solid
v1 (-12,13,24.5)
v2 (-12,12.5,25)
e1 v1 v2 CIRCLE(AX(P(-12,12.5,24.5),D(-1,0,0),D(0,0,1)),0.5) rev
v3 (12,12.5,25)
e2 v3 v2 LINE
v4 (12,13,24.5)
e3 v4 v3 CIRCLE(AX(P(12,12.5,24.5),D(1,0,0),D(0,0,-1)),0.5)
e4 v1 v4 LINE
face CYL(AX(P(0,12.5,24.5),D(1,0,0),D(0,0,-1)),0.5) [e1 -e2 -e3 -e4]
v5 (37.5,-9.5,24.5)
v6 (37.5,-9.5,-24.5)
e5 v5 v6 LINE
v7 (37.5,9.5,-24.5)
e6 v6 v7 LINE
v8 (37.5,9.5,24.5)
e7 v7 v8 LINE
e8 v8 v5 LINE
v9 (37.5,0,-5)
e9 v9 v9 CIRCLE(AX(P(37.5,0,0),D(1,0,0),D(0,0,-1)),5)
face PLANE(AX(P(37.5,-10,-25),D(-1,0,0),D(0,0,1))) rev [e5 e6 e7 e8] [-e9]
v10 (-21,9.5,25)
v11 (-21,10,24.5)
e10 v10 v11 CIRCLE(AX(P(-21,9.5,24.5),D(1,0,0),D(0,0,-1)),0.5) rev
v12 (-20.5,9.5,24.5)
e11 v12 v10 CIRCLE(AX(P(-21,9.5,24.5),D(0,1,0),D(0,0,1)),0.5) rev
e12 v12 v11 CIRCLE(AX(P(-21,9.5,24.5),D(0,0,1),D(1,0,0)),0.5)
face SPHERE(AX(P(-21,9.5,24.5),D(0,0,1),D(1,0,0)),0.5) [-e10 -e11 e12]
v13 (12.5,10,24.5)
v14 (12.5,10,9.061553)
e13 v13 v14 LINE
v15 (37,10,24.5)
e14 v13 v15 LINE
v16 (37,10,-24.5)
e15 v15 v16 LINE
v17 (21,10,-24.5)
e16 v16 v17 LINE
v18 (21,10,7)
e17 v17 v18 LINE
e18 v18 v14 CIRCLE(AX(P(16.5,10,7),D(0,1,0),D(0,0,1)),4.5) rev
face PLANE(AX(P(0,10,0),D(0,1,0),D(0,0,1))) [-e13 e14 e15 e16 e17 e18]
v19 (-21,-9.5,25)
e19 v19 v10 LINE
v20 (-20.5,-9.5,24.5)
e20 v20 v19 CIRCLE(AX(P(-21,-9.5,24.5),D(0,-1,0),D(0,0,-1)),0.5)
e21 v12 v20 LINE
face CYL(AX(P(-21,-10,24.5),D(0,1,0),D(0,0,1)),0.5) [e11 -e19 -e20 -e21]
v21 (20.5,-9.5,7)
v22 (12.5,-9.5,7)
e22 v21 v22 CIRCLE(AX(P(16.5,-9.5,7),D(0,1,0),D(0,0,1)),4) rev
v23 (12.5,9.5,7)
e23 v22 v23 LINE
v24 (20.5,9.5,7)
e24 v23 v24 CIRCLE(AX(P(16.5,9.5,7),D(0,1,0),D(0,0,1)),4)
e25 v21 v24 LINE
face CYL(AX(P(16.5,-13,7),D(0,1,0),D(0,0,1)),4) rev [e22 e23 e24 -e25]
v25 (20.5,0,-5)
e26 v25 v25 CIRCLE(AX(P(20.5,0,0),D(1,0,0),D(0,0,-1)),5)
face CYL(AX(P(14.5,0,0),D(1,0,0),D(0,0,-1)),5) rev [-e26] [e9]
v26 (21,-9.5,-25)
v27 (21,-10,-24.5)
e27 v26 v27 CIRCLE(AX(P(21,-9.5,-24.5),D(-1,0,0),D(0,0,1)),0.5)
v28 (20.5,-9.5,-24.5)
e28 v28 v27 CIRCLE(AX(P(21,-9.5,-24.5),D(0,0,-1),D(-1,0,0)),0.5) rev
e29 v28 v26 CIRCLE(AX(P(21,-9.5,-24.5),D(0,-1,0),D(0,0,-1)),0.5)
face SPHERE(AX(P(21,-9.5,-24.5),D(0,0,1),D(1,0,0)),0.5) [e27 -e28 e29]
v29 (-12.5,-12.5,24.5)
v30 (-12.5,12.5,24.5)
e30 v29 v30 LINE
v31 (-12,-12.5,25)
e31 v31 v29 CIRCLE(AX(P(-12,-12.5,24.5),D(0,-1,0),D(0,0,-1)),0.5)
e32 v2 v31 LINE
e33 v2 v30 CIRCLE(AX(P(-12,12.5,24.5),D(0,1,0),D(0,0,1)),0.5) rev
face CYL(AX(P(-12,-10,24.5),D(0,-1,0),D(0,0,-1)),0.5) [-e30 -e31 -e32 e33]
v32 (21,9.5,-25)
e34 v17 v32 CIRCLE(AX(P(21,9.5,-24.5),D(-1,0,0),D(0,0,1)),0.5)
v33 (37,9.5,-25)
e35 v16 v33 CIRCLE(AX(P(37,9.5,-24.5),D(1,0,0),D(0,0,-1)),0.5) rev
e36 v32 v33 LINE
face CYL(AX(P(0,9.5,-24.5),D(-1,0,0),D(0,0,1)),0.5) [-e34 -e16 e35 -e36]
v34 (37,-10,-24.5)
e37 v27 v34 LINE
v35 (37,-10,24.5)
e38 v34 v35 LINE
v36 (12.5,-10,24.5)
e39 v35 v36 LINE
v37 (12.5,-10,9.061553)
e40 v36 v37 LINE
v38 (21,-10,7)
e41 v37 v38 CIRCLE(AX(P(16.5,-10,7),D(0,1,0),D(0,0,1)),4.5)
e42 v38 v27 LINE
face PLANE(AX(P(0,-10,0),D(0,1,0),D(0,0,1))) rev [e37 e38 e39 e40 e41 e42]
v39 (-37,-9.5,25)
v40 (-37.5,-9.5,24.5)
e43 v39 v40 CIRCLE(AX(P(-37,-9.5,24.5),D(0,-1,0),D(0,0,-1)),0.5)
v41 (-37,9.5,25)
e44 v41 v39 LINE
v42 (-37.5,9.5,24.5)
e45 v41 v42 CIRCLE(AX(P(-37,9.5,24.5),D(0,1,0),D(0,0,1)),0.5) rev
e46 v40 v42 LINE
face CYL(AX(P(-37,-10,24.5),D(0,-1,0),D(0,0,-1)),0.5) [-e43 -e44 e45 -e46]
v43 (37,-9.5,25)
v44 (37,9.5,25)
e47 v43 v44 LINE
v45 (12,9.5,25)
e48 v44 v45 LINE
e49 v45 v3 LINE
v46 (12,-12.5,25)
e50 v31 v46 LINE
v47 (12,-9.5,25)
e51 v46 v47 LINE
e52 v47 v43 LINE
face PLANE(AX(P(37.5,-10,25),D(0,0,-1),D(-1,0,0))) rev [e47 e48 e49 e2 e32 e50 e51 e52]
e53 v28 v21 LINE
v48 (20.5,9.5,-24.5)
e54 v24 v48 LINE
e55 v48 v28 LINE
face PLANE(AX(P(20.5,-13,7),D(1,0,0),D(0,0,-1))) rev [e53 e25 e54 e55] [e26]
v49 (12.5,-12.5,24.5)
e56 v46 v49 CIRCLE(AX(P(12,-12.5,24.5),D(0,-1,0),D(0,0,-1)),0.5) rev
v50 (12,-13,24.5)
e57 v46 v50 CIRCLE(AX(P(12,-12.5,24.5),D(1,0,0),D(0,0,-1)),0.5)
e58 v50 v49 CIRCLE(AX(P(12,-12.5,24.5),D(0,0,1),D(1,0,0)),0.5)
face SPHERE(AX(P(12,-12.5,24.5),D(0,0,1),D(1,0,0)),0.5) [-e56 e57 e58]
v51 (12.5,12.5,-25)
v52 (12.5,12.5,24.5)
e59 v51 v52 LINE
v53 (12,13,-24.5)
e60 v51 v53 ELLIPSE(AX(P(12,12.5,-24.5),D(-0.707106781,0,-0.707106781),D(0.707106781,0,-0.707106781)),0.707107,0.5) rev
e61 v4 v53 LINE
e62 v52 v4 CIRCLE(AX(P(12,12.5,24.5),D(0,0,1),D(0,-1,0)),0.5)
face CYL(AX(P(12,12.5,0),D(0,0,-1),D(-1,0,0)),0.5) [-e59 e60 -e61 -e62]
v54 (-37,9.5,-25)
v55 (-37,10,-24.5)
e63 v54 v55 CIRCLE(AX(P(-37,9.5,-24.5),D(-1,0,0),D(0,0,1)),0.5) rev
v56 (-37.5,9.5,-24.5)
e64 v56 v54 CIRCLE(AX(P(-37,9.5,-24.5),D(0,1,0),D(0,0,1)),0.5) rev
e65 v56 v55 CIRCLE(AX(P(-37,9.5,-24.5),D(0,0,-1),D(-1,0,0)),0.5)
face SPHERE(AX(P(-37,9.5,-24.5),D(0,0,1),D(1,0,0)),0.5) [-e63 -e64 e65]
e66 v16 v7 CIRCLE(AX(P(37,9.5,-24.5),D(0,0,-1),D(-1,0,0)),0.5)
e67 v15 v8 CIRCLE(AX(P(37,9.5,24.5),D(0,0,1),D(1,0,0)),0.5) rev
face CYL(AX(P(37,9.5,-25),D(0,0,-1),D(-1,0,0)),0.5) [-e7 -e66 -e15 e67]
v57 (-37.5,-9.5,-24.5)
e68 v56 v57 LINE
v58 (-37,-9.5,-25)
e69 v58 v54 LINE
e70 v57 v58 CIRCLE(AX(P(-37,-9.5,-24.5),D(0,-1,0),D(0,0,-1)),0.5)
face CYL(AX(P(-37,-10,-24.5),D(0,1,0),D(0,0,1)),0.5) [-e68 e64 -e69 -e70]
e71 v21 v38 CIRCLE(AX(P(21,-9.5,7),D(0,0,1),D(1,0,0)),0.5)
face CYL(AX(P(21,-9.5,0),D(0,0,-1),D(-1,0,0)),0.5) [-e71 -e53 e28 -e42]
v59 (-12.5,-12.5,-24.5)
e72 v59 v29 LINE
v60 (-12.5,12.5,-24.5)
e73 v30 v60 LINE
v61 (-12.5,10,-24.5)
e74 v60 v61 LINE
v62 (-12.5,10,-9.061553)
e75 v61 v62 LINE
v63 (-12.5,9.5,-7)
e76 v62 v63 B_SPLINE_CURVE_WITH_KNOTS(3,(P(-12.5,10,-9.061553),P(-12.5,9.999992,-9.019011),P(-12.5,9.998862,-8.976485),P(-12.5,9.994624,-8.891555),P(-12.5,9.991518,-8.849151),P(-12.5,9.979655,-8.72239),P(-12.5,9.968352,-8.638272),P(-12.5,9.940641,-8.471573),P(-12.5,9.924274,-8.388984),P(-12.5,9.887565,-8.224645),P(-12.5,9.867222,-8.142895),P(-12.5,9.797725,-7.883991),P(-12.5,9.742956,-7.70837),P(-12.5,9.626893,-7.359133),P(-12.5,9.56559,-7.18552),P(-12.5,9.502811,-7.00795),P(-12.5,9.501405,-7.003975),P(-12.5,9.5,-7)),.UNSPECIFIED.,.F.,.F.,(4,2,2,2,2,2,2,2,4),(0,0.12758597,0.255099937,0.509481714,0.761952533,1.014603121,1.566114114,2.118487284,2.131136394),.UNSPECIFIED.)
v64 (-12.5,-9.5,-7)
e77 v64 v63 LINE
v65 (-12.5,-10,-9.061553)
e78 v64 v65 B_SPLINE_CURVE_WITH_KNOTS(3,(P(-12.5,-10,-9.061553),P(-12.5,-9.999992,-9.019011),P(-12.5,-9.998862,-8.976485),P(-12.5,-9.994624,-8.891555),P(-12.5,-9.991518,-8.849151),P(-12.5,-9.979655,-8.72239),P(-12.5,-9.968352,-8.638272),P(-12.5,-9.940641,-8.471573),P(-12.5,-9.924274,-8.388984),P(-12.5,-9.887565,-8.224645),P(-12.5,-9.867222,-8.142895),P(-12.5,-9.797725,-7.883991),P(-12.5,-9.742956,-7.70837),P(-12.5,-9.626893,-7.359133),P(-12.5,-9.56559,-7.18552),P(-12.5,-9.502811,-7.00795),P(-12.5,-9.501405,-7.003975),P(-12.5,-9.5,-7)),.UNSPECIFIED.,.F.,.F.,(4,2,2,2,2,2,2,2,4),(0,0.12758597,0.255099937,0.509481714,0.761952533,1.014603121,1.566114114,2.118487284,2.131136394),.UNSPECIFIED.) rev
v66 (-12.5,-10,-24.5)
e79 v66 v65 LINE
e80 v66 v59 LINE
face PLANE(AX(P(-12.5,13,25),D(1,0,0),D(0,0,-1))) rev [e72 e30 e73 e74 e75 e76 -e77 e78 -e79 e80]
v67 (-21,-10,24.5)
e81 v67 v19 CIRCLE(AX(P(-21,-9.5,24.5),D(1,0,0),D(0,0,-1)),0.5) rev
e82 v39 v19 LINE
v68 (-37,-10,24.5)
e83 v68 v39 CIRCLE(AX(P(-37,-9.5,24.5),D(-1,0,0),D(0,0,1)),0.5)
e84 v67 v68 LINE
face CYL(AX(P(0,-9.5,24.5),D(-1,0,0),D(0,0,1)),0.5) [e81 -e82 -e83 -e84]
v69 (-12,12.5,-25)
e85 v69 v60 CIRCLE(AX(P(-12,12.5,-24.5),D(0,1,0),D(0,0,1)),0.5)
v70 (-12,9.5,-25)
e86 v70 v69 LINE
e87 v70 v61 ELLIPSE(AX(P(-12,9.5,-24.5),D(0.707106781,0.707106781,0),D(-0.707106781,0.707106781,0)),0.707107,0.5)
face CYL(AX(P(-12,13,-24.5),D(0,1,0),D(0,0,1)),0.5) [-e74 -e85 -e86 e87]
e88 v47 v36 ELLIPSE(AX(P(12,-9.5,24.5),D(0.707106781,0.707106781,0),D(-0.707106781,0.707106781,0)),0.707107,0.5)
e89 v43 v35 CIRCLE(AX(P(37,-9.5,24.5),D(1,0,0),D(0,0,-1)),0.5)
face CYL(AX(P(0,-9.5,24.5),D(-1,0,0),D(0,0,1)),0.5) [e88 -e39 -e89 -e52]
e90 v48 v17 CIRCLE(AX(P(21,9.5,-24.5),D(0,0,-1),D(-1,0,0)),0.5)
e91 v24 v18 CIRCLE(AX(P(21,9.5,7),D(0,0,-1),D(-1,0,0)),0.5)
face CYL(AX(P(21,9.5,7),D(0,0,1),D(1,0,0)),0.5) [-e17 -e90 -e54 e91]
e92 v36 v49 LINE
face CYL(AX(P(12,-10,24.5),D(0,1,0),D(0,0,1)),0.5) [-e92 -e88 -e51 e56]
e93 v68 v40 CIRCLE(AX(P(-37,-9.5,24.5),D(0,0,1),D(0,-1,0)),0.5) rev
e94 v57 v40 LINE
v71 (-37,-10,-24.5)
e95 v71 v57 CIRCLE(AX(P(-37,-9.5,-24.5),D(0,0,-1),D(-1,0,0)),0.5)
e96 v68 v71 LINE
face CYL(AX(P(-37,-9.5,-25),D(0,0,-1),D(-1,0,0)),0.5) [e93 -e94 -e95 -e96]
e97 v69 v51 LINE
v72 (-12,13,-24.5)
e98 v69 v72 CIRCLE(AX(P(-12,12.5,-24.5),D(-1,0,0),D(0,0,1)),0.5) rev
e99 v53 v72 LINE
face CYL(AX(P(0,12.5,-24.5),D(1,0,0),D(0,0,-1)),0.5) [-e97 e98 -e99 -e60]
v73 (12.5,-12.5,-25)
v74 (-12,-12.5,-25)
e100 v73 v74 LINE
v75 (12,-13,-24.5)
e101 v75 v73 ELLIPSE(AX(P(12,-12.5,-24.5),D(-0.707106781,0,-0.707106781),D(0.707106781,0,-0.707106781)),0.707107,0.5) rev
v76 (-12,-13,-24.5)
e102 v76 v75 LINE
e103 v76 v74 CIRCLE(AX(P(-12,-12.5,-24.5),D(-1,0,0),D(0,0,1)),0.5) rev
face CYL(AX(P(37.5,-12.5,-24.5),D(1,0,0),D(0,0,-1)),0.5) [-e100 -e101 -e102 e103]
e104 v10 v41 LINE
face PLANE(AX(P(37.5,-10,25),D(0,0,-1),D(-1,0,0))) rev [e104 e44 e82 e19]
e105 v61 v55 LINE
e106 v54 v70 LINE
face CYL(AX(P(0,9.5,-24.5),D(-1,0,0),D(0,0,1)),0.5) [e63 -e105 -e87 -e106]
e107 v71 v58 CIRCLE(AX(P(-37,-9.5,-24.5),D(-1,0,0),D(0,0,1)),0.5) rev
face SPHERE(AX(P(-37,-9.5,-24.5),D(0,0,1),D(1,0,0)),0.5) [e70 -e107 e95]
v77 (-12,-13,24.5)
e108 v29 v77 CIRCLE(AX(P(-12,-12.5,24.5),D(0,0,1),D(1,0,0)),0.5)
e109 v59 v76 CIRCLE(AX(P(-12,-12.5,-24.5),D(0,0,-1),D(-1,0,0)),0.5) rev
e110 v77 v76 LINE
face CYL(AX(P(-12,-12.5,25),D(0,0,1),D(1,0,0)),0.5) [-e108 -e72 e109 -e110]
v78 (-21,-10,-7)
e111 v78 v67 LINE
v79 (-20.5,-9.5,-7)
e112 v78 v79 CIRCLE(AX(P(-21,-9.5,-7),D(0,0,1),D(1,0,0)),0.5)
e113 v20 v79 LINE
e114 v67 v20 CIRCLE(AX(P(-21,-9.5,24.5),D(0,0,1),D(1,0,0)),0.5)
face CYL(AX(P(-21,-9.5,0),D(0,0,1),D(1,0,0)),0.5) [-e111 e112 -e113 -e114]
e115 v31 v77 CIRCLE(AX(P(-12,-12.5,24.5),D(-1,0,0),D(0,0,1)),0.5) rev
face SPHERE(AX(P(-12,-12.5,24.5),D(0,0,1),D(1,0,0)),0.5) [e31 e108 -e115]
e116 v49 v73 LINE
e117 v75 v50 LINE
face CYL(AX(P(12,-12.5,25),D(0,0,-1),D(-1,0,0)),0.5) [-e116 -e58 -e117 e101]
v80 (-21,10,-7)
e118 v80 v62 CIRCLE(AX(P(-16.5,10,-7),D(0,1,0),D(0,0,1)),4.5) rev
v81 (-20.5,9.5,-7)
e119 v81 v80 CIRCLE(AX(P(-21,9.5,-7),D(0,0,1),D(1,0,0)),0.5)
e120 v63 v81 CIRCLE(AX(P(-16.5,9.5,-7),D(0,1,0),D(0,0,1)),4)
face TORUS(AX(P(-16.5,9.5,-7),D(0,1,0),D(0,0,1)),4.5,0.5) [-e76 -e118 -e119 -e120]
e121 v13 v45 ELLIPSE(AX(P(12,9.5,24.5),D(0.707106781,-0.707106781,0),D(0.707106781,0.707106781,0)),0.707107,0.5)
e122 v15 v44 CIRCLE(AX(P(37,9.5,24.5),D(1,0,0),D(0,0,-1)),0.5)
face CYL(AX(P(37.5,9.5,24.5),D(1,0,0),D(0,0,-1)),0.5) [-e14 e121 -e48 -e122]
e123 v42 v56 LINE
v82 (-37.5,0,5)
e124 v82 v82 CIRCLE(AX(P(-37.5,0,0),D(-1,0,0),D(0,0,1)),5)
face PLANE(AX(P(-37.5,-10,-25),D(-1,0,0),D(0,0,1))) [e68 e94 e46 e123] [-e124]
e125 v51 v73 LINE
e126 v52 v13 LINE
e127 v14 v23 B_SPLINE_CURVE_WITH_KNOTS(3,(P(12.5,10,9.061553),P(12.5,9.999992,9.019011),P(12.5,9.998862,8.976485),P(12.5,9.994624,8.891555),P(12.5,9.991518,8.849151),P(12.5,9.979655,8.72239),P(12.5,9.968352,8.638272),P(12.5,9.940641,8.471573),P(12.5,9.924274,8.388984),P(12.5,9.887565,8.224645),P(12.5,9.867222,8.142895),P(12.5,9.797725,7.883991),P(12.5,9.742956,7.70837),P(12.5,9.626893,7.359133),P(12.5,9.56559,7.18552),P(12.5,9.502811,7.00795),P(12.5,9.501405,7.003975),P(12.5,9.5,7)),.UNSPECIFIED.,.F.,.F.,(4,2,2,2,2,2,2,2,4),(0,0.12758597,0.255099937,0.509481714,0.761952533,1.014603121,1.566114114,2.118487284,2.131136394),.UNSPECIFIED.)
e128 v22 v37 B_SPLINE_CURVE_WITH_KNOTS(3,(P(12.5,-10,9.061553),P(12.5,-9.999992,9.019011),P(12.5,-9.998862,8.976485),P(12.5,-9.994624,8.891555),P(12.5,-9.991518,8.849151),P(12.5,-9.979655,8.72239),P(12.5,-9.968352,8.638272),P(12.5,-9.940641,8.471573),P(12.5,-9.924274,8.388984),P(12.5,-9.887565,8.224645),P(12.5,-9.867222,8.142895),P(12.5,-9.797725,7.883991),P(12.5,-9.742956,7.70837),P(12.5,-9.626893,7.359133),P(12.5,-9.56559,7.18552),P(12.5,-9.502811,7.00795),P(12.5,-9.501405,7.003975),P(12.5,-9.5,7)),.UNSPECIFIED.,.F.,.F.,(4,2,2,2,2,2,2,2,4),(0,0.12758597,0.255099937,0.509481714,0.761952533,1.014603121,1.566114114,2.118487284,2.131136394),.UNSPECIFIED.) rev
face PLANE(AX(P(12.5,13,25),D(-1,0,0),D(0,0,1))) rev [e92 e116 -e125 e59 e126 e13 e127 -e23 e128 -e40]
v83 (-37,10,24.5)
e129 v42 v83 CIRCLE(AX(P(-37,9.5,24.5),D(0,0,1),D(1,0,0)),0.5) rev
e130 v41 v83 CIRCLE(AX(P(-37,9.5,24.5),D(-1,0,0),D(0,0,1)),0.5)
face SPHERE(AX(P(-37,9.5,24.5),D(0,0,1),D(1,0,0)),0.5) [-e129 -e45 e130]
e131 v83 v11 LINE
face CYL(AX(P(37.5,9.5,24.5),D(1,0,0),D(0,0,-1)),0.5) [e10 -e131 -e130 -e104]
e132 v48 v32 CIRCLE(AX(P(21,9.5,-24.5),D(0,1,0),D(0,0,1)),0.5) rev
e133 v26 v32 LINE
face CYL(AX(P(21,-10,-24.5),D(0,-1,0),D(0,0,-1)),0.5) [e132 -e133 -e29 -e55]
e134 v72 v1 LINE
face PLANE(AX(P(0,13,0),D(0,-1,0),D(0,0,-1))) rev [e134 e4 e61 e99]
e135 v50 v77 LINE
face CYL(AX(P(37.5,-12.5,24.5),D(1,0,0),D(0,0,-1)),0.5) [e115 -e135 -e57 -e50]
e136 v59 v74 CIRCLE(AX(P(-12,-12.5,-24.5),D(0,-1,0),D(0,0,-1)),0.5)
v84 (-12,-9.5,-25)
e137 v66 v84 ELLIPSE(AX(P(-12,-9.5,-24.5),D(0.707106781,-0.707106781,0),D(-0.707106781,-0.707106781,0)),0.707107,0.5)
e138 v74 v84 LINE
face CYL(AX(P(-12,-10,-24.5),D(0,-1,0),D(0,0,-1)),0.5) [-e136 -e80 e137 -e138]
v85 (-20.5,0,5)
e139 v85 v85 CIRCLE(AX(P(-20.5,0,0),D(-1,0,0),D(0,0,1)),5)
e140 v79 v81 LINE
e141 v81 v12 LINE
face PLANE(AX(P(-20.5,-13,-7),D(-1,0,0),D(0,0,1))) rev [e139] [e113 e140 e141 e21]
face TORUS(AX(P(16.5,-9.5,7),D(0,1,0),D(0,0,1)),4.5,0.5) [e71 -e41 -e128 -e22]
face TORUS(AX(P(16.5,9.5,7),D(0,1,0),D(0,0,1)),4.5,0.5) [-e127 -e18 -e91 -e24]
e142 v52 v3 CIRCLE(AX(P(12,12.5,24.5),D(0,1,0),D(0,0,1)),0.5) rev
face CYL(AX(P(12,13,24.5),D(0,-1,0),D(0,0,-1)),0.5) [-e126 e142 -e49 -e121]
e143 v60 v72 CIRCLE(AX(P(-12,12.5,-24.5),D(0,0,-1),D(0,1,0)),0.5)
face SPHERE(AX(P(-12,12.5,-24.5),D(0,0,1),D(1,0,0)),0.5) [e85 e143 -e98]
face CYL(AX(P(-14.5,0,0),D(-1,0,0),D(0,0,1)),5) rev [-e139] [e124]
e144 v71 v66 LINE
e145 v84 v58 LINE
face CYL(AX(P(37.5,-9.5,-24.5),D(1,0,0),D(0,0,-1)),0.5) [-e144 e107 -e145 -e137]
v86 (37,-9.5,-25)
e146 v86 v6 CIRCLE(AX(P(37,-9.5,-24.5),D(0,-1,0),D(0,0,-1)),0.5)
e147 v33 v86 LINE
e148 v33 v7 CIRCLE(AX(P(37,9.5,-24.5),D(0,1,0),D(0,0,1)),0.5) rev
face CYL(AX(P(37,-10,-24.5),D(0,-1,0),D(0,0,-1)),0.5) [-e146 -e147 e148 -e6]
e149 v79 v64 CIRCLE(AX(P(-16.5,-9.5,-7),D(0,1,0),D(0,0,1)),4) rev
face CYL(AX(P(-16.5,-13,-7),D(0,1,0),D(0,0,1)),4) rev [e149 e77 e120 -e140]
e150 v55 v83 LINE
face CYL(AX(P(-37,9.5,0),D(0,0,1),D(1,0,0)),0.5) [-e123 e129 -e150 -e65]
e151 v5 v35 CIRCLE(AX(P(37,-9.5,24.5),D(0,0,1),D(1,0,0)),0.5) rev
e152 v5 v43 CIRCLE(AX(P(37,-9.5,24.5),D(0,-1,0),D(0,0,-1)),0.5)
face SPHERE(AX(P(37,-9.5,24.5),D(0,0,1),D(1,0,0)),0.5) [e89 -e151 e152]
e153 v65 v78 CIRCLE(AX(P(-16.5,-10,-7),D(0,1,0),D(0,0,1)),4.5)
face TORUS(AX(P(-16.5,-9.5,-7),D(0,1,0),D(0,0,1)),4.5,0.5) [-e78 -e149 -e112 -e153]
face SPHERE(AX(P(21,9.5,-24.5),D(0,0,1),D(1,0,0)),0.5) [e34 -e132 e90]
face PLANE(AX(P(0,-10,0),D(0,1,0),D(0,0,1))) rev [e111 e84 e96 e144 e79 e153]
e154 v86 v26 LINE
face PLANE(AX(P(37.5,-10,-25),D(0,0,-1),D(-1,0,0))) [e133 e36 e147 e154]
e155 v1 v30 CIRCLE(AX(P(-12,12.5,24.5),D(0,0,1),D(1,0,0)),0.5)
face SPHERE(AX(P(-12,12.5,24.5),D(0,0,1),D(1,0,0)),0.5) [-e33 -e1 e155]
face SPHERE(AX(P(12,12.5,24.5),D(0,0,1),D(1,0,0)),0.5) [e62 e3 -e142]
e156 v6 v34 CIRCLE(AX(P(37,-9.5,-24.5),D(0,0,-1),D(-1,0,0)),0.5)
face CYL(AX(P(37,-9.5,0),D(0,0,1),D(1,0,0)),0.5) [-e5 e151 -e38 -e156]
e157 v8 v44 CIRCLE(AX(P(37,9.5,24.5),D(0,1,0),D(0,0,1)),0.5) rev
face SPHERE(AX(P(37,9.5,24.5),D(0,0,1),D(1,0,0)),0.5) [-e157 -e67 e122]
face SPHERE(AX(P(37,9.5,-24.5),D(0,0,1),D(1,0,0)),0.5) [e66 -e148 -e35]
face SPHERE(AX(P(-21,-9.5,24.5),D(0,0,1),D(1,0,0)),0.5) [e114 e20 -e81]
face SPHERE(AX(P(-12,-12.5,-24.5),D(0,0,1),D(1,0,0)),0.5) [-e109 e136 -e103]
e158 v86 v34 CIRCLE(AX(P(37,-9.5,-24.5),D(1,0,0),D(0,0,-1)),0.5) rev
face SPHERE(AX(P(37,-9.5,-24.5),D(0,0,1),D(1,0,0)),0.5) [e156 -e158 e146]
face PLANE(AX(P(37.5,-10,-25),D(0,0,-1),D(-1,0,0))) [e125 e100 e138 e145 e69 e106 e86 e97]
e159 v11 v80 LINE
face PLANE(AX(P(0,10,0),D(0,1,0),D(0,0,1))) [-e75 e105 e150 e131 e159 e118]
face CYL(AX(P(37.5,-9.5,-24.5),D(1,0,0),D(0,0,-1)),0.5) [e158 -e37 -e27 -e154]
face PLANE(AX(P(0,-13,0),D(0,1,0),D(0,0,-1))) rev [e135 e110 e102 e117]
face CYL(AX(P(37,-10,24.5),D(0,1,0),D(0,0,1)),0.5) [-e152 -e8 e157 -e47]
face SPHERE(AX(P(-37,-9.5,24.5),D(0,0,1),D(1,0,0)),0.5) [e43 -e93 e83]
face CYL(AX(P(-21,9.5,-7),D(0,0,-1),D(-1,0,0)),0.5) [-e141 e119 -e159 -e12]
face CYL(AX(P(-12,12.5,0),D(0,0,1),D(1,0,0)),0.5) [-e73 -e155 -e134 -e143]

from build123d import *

# Parameters (mm, degrees)
BOSS_EXTRUDE1_DEPTH      = 10
BOSS_EXTRUDE1_DEPTH_BACK = 10
SKETCH1_W                = 75
SKETCH1_H                = 50
SKETCH2_W                = 25
SKETCH2_H                = 50
BOSS_EXTRUDE2_DEPTH      = 3
CUT_EXTRUDE1_DEPTH       = 23
SKETCH5_R                = 5
CUT_EXTRUDE2_DEPTH       = 23
CUT_EXTRUDE3_START       = -23
SKETCH4_R                = 5
CUT_EXTRUDE3_DEPTH       = 23
FILLET1_R                = 0.5


with BuildPart() as part:
    # Sketch1 → Boss-Extrude1 (new, two sides: drawn at the far end of the back side and taken through both)
    with BuildSketch(Plane(origin=(0, 0, 0), x_dir=(1, 0, 0), z_dir=(0, 1, 0)).offset(-BOSS_EXTRUDE1_DEPTH_BACK)):
        Rectangle(SKETCH1_W, SKETCH1_H)
    extrude(amount=BOSS_EXTRUDE1_DEPTH + BOSS_EXTRUDE1_DEPTH_BACK)

    # Sketch2 → Boss-Extrude2 (add)
    with BuildSketch(Plane(origin=(0, 10, 0), x_dir=(1, 0, 0), z_dir=(0, 1, 0))):
        Rectangle(SKETCH2_W, SKETCH2_H)
    boss_extrude2 = extrude(amount=BOSS_EXTRUDE2_DEPTH)

    # Mirror1: Boss-Extrude2 across plane
    add(boss_extrude2.mirror(Plane.ZX))

    # Sketch3 → Cut-Extrude1 (cut)
    with BuildSketch(Plane(origin=(0, 10, 0), x_dir=(1, 0, 0), z_dir=(0, 1, 0))):
        with BuildLine():
            Line((20.5, -7), (20.5, 25))
            Line((20.5, 25), (12.5, 25))
            Line((12.5, 25), (12.5, -7))
            ThreePointArc((12.5, -7), (16.5, -11), (20.5, -7))
        make_face()
        with BuildLine():
            Line((-20.5, 7), (-20.5, -25))
            Line((-20.5, -25), (-12.5, -25))
            Line((-12.5, -25), (-12.5, 7))
            ThreePointArc((-12.5, 7), (-16.5, 11), (-20.5, 7))
        make_face()
    extrude(amount=-CUT_EXTRUDE1_DEPTH, mode=Mode.SUBTRACT)

    # Sketch5 → Cut-Extrude2 (cut)
    with BuildSketch(Plane.ZY.offset(37.5)):
        Circle(SKETCH5_R)
    extrude(amount=-CUT_EXTRUDE2_DEPTH, mode=Mode.SUBTRACT)

    # Sketch4 → Cut-Extrude3 (cut)
    with BuildSketch(Plane(origin=(37.5, 0, 0), x_dir=(0, 0, -1), z_dir=(1, 0, 0)).offset(CUT_EXTRUDE3_START)):
        with Locations(Location((0, 0, 0), (0, 0, 180))):
            Circle(SKETCH4_R)
    extrude(amount=CUT_EXTRUDE3_DEPTH, mode=Mode.SUBTRACT)

    # Fillet1
    # the kernel refuses this fillet: 0.5 mm, written as the material it takes off along each edge
    with BuildSketch(Plane(origin=(37, -9.5, 24.5), x_dir=(0, -1, 0), z_dir=(1, 0, 0))) as fillet1_piece_1_section:
        Polygon((0, 0), (FILLET1_R, 0), (FILLET1_R, -FILLET1_R), (0, -FILLET1_R), align=None)
    fillet1_piece_1 = extrude(amount=FILLET1_R, mode=Mode.PRIVATE)
    fillet1_piece_1 = fillet1_piece_1 - Plane(origin=(37, -9.5, 24.5), x_dir=(0, 0.7071067811865475, -0.7071067811865475), z_dir=(1, 0, 0)) * Sphere(FILLET1_R, mode=Mode.PRIVATE)
    add(fillet1_piece_1, mode=Mode.SUBTRACT)
    with BuildSketch(Plane(origin=(37, 9.5, 24.5), x_dir=(0, 1, 0), z_dir=(1, 0, 0))) as fillet1_piece_2_section:
        Polygon((0, 0), (FILLET1_R, 0), (FILLET1_R, FILLET1_R), (0, FILLET1_R), align=None)
    fillet1_piece_2 = extrude(amount=FILLET1_R, mode=Mode.PRIVATE)
    fillet1_piece_2 = fillet1_piece_2 - Plane(origin=(37, 9.5, 24.5), x_dir=(0, -0.7071067811865475, -0.7071067811865475), z_dir=(1, 0, 0)) * Sphere(FILLET1_R, mode=Mode.PRIVATE)
    add(fillet1_piece_2, mode=Mode.SUBTRACT)
    with BuildSketch(Plane(origin=(37, 9.5, -24.5), x_dir=(1, 0, 0), z_dir=(0, 0, -1))) as fillet1_piece_3_section:
        Polygon((0, 0), (FILLET1_R, 0), (FILLET1_R, -FILLET1_R), (0, -FILLET1_R), align=None)
    fillet1_piece_3 = extrude(amount=FILLET1_R, mode=Mode.PRIVATE)
    fillet1_piece_3 = fillet1_piece_3 - Plane(origin=(37, 9.5, -24.5), x_dir=(-0.7071067811865475, -0.7071067811865475, 0), z_dir=(0, 0, -1)) * Sphere(FILLET1_R, mode=Mode.PRIVATE)
    add(fillet1_piece_3, mode=Mode.SUBTRACT)
    with BuildSketch(Plane(origin=(21, 9.5, -24.5), x_dir=(-1, 0, 0), z_dir=(0, 0, -1))) as fillet1_piece_4_section:
        Polygon((0, 0), (FILLET1_R, 0), (FILLET1_R, FILLET1_R), (0, FILLET1_R), align=None)
    fillet1_piece_4 = extrude(amount=FILLET1_R, mode=Mode.PRIVATE)
    fillet1_piece_4 = fillet1_piece_4 - Plane(origin=(21, 9.5, -24.5), x_dir=(0.7071067811865475, -0.7071067811865475, 0), z_dir=(0, 0, -1)) * Sphere(FILLET1_R, mode=Mode.PRIVATE)
    add(fillet1_piece_4, mode=Mode.SUBTRACT)
    with BuildSketch(Plane(origin=(-37, 9.5, -24.5), x_dir=(0, 0, -1), z_dir=(-1, 0, 0))) as fillet1_piece_5_section:
        Polygon((0, 0), (FILLET1_R, 0), (FILLET1_R, -FILLET1_R), (0, -FILLET1_R), align=None)
    fillet1_piece_5 = extrude(amount=FILLET1_R, mode=Mode.PRIVATE)
    fillet1_piece_5 = fillet1_piece_5 - Plane(origin=(-37, 9.5, -24.5), x_dir=(0, -0.7071067811865475, 0.7071067811865475), z_dir=(-1, 0, 0)) * Sphere(FILLET1_R, mode=Mode.PRIVATE)
    add(fillet1_piece_5, mode=Mode.SUBTRACT)
    with BuildSketch(Plane(origin=(-37, 9.5, 24.5), x_dir=(0, 0, 1), z_dir=(-1, 0, 0))) as fillet1_piece_6_section:
        Polygon((0, 0), (FILLET1_R, 0), (FILLET1_R, FILLET1_R), (0, FILLET1_R), align=None)
    fillet1_piece_6 = extrude(amount=FILLET1_R, mode=Mode.PRIVATE)
    fillet1_piece_6 = fillet1_piece_6 - Plane(origin=(-37, 9.5, 24.5), x_dir=(0, -0.7071067811865475, -0.7071067811865475), z_dir=(-1, 0, 0)) * Sphere(FILLET1_R, mode=Mode.PRIVATE)
    add(fillet1_piece_6, mode=Mode.SUBTRACT)
    with BuildSketch(Plane(origin=(37, -9.5, -24.5), x_dir=(1, 0, 0), z_dir=(0, 0, -1))) as fillet1_piece_7_section:
        Polygon((0, 0), (FILLET1_R, 0), (FILLET1_R, FILLET1_R), (0, FILLET1_R), align=None)
    fillet1_piece_7 = extrude(amount=FILLET1_R, mode=Mode.PRIVATE)
    fillet1_piece_7 = fillet1_piece_7 - Plane(origin=(37, -9.5, -24.5), x_dir=(-0.7071067811865475, 0.7071067811865475, 0), z_dir=(0, 0, -1)) * Sphere(FILLET1_R, mode=Mode.PRIVATE)
    add(fillet1_piece_7, mode=Mode.SUBTRACT)
    with BuildSketch(Plane(origin=(12, 12.5, 24.5), x_dir=(0, 0, 1), z_dir=(0, 1, 0))) as fillet1_piece_8_section:
        Polygon((0, 0), (FILLET1_R, 0), (FILLET1_R, FILLET1_R), (0, FILLET1_R), align=None)
    fillet1_piece_8 = extrude(amount=FILLET1_R, mode=Mode.PRIVATE)
    fillet1_piece_8 = fillet1_piece_8 - Plane(origin=(12, 12.5, 24.5), x_dir=(-0.7071067811865477, 0, -0.7071067811865475), z_dir=(0, 1, 0)) * Sphere(FILLET1_R, mode=Mode.PRIVATE)
    add(fillet1_piece_8, mode=Mode.SUBTRACT)
    with BuildSketch(Plane(origin=(-12, 12.5, -24.5), x_dir=(0, 1, 0), z_dir=(-1, 0, 0))) as fillet1_piece_9_section:
        Polygon((0, 0), (FILLET1_R, 0), (FILLET1_R, FILLET1_R), (0, FILLET1_R), align=None)
    fillet1_piece_9 = extrude(amount=FILLET1_R, mode=Mode.PRIVATE)
    fillet1_piece_9 = fillet1_piece_9 - Plane(origin=(-12, 12.5, -24.5), x_dir=(0, -0.7071067811865475, 0.7071067811865475), z_dir=(-1, 0, 0)) * Sphere(FILLET1_R, mode=Mode.PRIVATE)
    add(fillet1_piece_9, mode=Mode.SUBTRACT)
    with BuildSketch(Plane(origin=(-12, 12.5, 24.5), x_dir=(0, 1, 0), z_dir=(-1, 0, 0))) as fillet1_piece_10_section:
        Polygon((0, 0), (FILLET1_R, 0), (FILLET1_R, -FILLET1_R), (0, -FILLET1_R), align=None)
    fillet1_piece_10 = extrude(amount=FILLET1_R, mode=Mode.PRIVATE)
    fillet1_piece_10 = fillet1_piece_10 - Plane(origin=(-12, 12.5, 24.5), x_dir=(0, -0.7071067811865475, -0.7071067811865475), z_dir=(-1, 0, 0)) * Sphere(FILLET1_R, mode=Mode.PRIVATE)
    add(fillet1_piece_10, mode=Mode.SUBTRACT)
    with BuildSketch(Plane(origin=(-12, -12.5, 24.5), x_dir=(-1, 0, 0), z_dir=(0, -1, 0))) as fillet1_piece_11_section:
        Polygon((0, 0), (FILLET1_R, 0), (FILLET1_R, -FILLET1_R), (0, -FILLET1_R), align=None)
    fillet1_piece_11 = extrude(amount=FILLET1_R, mode=Mode.PRIVATE)
    fillet1_piece_11 = fillet1_piece_11 - Plane(origin=(-12, -12.5, 24.5), x_dir=(0.7071067811865474, 0, -0.7071067811865477), z_dir=(0, -1, 0)) * Sphere(FILLET1_R, mode=Mode.PRIVATE)
    add(fillet1_piece_11, mode=Mode.SUBTRACT)
    with BuildSketch(Plane(origin=(-37, -9.5, -24.5), x_dir=(0, 0, -1), z_dir=(-1, 0, 0))) as fillet1_piece_12_section:
        Polygon((0, 0), (FILLET1_R, 0), (FILLET1_R, FILLET1_R), (0, FILLET1_R), align=None)
    fillet1_piece_12 = extrude(amount=FILLET1_R, mode=Mode.PRIVATE)
    fillet1_piece_12 = fillet1_piece_12 - Plane(origin=(-37, -9.5, -24.5), x_dir=(0, 0.7071067811865475, 0.7071067811865475), z_dir=(-1, 0, 0)) * Sphere(FILLET1_R, mode=Mode.PRIVATE)
    add(fillet1_piece_12, mode=Mode.SUBTRACT)
    with BuildSketch(Plane(origin=(12, -12.5, 24.5), x_dir=(0, 0, 1), z_dir=(0, -1, 0))) as fillet1_piece_13_section:
        Polygon((0, 0), (FILLET1_R, 0), (FILLET1_R, -FILLET1_R), (0, -FILLET1_R), align=None)
    fillet1_piece_13 = extrude(amount=FILLET1_R, mode=Mode.PRIVATE)
    fillet1_piece_13 = fillet1_piece_13 - Plane(origin=(12, -12.5, 24.5), x_dir=(-0.7071067811865477, 0, -0.7071067811865475), z_dir=(0, -1, 0)) * Sphere(FILLET1_R, mode=Mode.PRIVATE)
    add(fillet1_piece_13, mode=Mode.SUBTRACT)
    with BuildSketch(Plane(origin=(-12, -12.5, -24.5), x_dir=(-1, 0, 0), z_dir=(0, -1, 0))) as fillet1_piece_14_section:
        Polygon((0, 0), (FILLET1_R, 0), (FILLET1_R, FILLET1_R), (0, FILLET1_R), align=None)
    fillet1_piece_14 = extrude(amount=FILLET1_R, mode=Mode.PRIVATE)
    fillet1_piece_14 = fillet1_piece_14 - Plane(origin=(-12, -12.5, -24.5), x_dir=(0.7071067811865476, 0, 0.7071067811865475), z_dir=(0, -1, 0)) * Sphere(FILLET1_R, mode=Mode.PRIVATE)
    add(fillet1_piece_14, mode=Mode.SUBTRACT)
    with BuildSketch(Plane(origin=(21, -9.5, -24.5), x_dir=(0, -1, 0), z_dir=(0, 0, -1))) as fillet1_piece_15_section:
        Polygon((0, 0), (FILLET1_R, 0), (FILLET1_R, FILLET1_R), (0, FILLET1_R), align=None)
    fillet1_piece_15 = extrude(amount=FILLET1_R, mode=Mode.PRIVATE)
    fillet1_piece_15 = fillet1_piece_15 - Plane(origin=(21, -9.5, -24.5), x_dir=(0.7071067811865475, 0.7071067811865475, 0), z_dir=(0, 0, -1)) * Sphere(FILLET1_R, mode=Mode.PRIVATE)
    add(fillet1_piece_15, mode=Mode.SUBTRACT)
    with BuildSketch(Plane(origin=(-21, 9.5, 24.5), x_dir=(0, 0, 1), z_dir=(1, 0, 0))) as fillet1_piece_16_section:
        Polygon((0, 0), (FILLET1_R, 0), (FILLET1_R, -FILLET1_R), (0, -FILLET1_R), align=None)
    fillet1_piece_16 = extrude(amount=FILLET1_R, mode=Mode.PRIVATE)
    fillet1_piece_16 = fillet1_piece_16 - Plane(origin=(-21, 9.5, 24.5), x_dir=(0, -0.7071067811865475, -0.7071067811865475), z_dir=(1, 0, 0)) * Sphere(FILLET1_R, mode=Mode.PRIVATE)
    add(fillet1_piece_16, mode=Mode.SUBTRACT)
    with BuildSketch(Plane(origin=(-37, -9.5, 24.5), x_dir=(0, 0, 1), z_dir=(-1, 0, 0))) as fillet1_piece_17_section:
        Polygon((0, 0), (FILLET1_R, 0), (FILLET1_R, -FILLET1_R), (0, -FILLET1_R), align=None)
    fillet1_piece_17 = extrude(amount=FILLET1_R, mode=Mode.PRIVATE)
    fillet1_piece_17 = fillet1_piece_17 - Plane(origin=(-37, -9.5, 24.5), x_dir=(0, 0.7071067811865475, -0.7071067811865475), z_dir=(-1, 0, 0)) * Sphere(FILLET1_R, mode=Mode.PRIVATE)
    add(fillet1_piece_17, mode=Mode.SUBTRACT)
    with BuildSketch(Plane(origin=(-21, -9.5, 24.5), x_dir=(0, 0, 1), z_dir=(1, 0, 0))) as fillet1_piece_18_section:
        Polygon((0, 0), (FILLET1_R, 0), (FILLET1_R, FILLET1_R), (0, FILLET1_R), align=None)
    fillet1_piece_18 = extrude(amount=FILLET1_R, mode=Mode.PRIVATE)
    fillet1_piece_18 = fillet1_piece_18 - Plane(origin=(-21, -9.5, 24.5), x_dir=(0, 0.7071067811865475, -0.7071067811865475), z_dir=(1, 0, 0)) * Sphere(FILLET1_R, mode=Mode.PRIVATE)
    add(fillet1_piece_18, mode=Mode.SUBTRACT)
    with BuildSketch(Plane(origin=(12.5, -10, 25), x_dir=(0, 0, -1), z_dir=(1, 0, 0)), Plane(origin=(-12.5, 10, -25), x_dir=(0, -1, 0), z_dir=(-1, 0, 0))) as fillet1_piece_19:
        with BuildLine():
            CenterArc((FILLET1_R, FILLET1_R), FILLET1_R, 180, 90)
            Line((0, FILLET1_R), (0, 0))
            Line((0, 0), (FILLET1_R, 0))
        make_face()
    extrude(amount=24.5, mode=Mode.SUBTRACT)
    with BuildSketch(Plane(origin=(12.5, 10, 25), x_dir=(0, 0, -1), z_dir=(1, 0, 0)), Plane(origin=(-12.5, -10, -25), x_dir=(0, 1, 0), z_dir=(-1, 0, 0))) as fillet1_piece_20:
        with BuildLine():
            CenterArc((FILLET1_R, -FILLET1_R), FILLET1_R, 90, 90)
            Line((0, -FILLET1_R), (0, 0))
            Line((0, 0), (FILLET1_R, 0))
        make_face()
    extrude(amount=24.5, mode=Mode.SUBTRACT)
    with BuildSketch(Plane(origin=(37.5, 10, 24.5), x_dir=(0, -1, 0), z_dir=(0, 0, -1)), Plane(origin=(-12.5, 13, -24.5), x_dir=(0, -1, 0), z_dir=(0, 0, 1)), Plane(origin=(-12.5, -13, -24.5), x_dir=(1, 0, 0), z_dir=(0, 0, 1)), Plane(origin=(-37.5, -10, -24.5), x_dir=(1, 0, 0), z_dir=(0, 0, 1))) as fillet1_piece_21:
        with BuildLine():
            CenterArc((FILLET1_R, FILLET1_R), FILLET1_R, 180, 90)
            Line((0, FILLET1_R), (0, 0))
            Line((0, 0), (FILLET1_R, 0))
        make_face()
    extrude(amount=49, mode=Mode.SUBTRACT)
    with BuildSketch(Plane(origin=(37, 10, -25), x_dir=(0, -1, 0), z_dir=(-1, 0, 0)), Plane(origin=(-37, -10, 25), x_dir=(0, 0, -1), z_dir=(1, 0, 0))) as fillet1_piece_22:
        with BuildLine():
            CenterArc((FILLET1_R, FILLET1_R), FILLET1_R, 180, 90)
            Line((0, FILLET1_R), (0, 0))
            Line((0, 0), (FILLET1_R, 0))
        make_face()
    extrude(amount=16, mode=Mode.SUBTRACT)
    with BuildSketch(Plane(origin=(-37.5, 10, -24.5), x_dir=(1, 0, 0), z_dir=(0, 0, 1)), Plane(origin=(37.5, -10, 24.5), x_dir=(0, 1, 0), z_dir=(0, 0, -1))) as fillet1_piece_23:
        with BuildLine():
            CenterArc((FILLET1_R, -FILLET1_R), FILLET1_R, 90, 90)
            Line((0, -FILLET1_R), (0, 0))
            Line((0, 0), (FILLET1_R, 0))
        make_face()
    extrude(amount=49, mode=Mode.SUBTRACT)
    with BuildSketch(Plane(origin=(12.5, 10, 25), x_dir=(-1, 0, 0), z_dir=(0, 1, 0)), Plane(origin=(-12.5, -10, -25), x_dir=(0, 0, 1), z_dir=(0, -1, 0))) as fillet1_piece_24:
        with BuildLine():
            CenterArc((FILLET1_R, -FILLET1_R), FILLET1_R, 90, 90)
            Line((0, -FILLET1_R), (0, 0))
            Line((0, 0), (FILLET1_R, 0))
        make_face()
    extrude(amount=2.5, mode=Mode.SUBTRACT)
    with BuildSketch(Plane(origin=(-12.5, 10, -25), x_dir=(0, 0, 1), z_dir=(0, 1, 0)), Plane(origin=(12.5, -10, 25), x_dir=(-1, 0, 0), z_dir=(0, -1, 0))) as fillet1_piece_25:
        with BuildLine():
            CenterArc((FILLET1_R, FILLET1_R), FILLET1_R, 180, 90)
            Line((0, FILLET1_R), (0, 0))
            Line((0, 0), (FILLET1_R, 0))
        make_face()
    extrude(amount=2.5, mode=Mode.SUBTRACT)
    with BuildSketch(Plane(origin=(-12.5, 12.5, 25), x_dir=(1, 0, 0), z_dir=(0, -1, 0))) as fillet1_piece_26:
        with BuildLine():
            CenterArc((FILLET1_R, -FILLET1_R), FILLET1_R, 90, 90)
            Line((0, -FILLET1_R), (0, 0))
            Line((0, 0), (FILLET1_R, 0))
        make_face()
    extrude(amount=25, mode=Mode.SUBTRACT)
    with BuildSketch(Plane(origin=(12.5, 13, 24.5), x_dir=(0, -1, 0), z_dir=(0, 0, -1))) as fillet1_piece_27:
        with BuildLine():
            CenterArc((FILLET1_R, FILLET1_R), FILLET1_R, 180, 90)
            Line((0, FILLET1_R), (0, 0))
            Line((0, 0), (FILLET1_R, 0))
        make_face()
    extrude(amount=50.75, mode=Mode.SUBTRACT)
    with BuildSketch(Plane(origin=(13.75, 13, -25), x_dir=(0, 0, 1), z_dir=(-1, 0, 0))) as fillet1_piece_28:
        with BuildLine():
            CenterArc((FILLET1_R, -FILLET1_R), FILLET1_R, 90, 90)
            Line((0, -FILLET1_R), (0, 0))
            Line((0, 0), (FILLET1_R, 0))
        make_face()
    extrude(amount=25.75, mode=Mode.SUBTRACT)
    with BuildSketch(Plane(origin=(-12, 13, 25), x_dir=(0, -1, 0), z_dir=(1, 0, 0))) as fillet1_piece_29:
        with BuildLine():
            CenterArc((FILLET1_R, FILLET1_R), FILLET1_R, 180, 90)
            Line((0, FILLET1_R), (0, 0))
            Line((0, 0), (FILLET1_R, 0))
        make_face()
    extrude(amount=24, mode=Mode.SUBTRACT)
    with BuildSketch(Plane(origin=(12.5, -13, 24.5), x_dir=(0, 1, 0), z_dir=(0, 0, -1))) as fillet1_piece_30:
        with BuildLine():
            CenterArc((FILLET1_R, -FILLET1_R), FILLET1_R, 90, 90)
            Line((0, -FILLET1_R), (0, 0))
            Line((0, 0), (FILLET1_R, 0))
        make_face()
    extrude(amount=50.75, mode=Mode.SUBTRACT)
    with BuildSketch(Plane(origin=(-12, -13, 25), x_dir=(0, 1, 0), z_dir=(1, 0, 0))) as fillet1_piece_31:
        with BuildLine():
            CenterArc((FILLET1_R, -FILLET1_R), FILLET1_R, 90, 90)
            Line((0, -FILLET1_R), (0, 0))
            Line((0, 0), (FILLET1_R, 0))
        make_face()
    extrude(amount=24, mode=Mode.SUBTRACT)
    with BuildSketch(Plane(origin=(13.75, -13, -25), x_dir=(0, 0, 1), z_dir=(-1, 0, 0))) as fillet1_piece_32:
        with BuildLine():
            CenterArc((FILLET1_R, FILLET1_R), FILLET1_R, 180, 90)
            Line((0, FILLET1_R), (0, 0))
            Line((0, 0), (FILLET1_R, 0))
        make_face()
    extrude(amount=25.75, mode=Mode.SUBTRACT)
    with BuildSketch(Plane(origin=(37, -10, -25), x_dir=(0, 1, 0), z_dir=(-1, 0, 0)), Plane(origin=(-37, 10, 25), x_dir=(0, 0, -1), z_dir=(1, 0, 0))) as fillet1_piece_33:
        with BuildLine():
            CenterArc((FILLET1_R, -FILLET1_R), FILLET1_R, 90, 90)
            Line((0, -FILLET1_R), (0, 0))
            Line((0, 0), (FILLET1_R, 0))
        make_face()
    extrude(amount=16, mode=Mode.SUBTRACT)
    with BuildSketch(Plane(origin=(20.5, -10, 7), x_dir=(1, 0, 0), z_dir=(0, 0, -1)), Plane(origin=(20.5, 10, 7), x_dir=(0, -1, 0), z_dir=(0, 0, -1)), Plane(origin=(-20.5, -10, -7), x_dir=(-1, 0, 0), z_dir=(0, 0, 1))) as fillet1_piece_34:
        with BuildLine():
            CenterArc((FILLET1_R, -FILLET1_R), FILLET1_R, 90, 90)
            Line((0, -FILLET1_R), (0, 0))
            Line((0, 0), (FILLET1_R, 0))
        make_face()
    extrude(amount=31.5, mode=Mode.SUBTRACT)
    with BuildSketch(Plane(origin=(20.5, 9.5, -25), x_dir=(1, 0, 0), z_dir=(0, -1, 0))) as fillet1_piece_35:
        with BuildLine():
            CenterArc((FILLET1_R, FILLET1_R), FILLET1_R, 180, 90)
            Line((0, FILLET1_R), (0, 0))
            Line((0, 0), (FILLET1_R, 0))
        make_face()
    extrude(amount=19, mode=Mode.SUBTRACT)
    with BuildSketch(Plane(origin=(16.5, -10, 7), x_dir=(-0.9514133218682644, 0, -0.3079166948568956), z_dir=(0.3079166948568956, 0, -0.9514133218682644))) as fillet1_piece_36_section:
        with BuildLine():
            CenterArc((4 + FILLET1_R, FILLET1_R), FILLET1_R, 180, 90)
            Line((4, FILLET1_R), (4, 0))
            Line((4, 0), (4 + FILLET1_R, 0))
        make_face()
    fillet1_piece_36 = revolve(axis=Axis((16.5, -10, 7), (0, 1, 0)), revolution_arc=197.933725613, mode=Mode.PRIVATE)
    fillet1_piece_36 = split(fillet1_piece_36, bisect_by=Plane(origin=(12.5, -9.730182657, 5.956665677), z_dir=(1, 0, 0)), keep=Keep.TOP, mode=Mode.PRIVATE)
    add(fillet1_piece_36, mode=Mode.SUBTRACT)
    with BuildSketch(Plane(origin=(16.5, 10, 7), x_dir=(-0.9514133218682644, 0, -0.3079166948568956), z_dir=(0.3079166948568956, 0, -0.9514133218682644))) as fillet1_piece_37_section:
        with BuildLine():
            CenterArc((4 + FILLET1_R, -FILLET1_R), FILLET1_R, 90, 90)
            Line((4, -FILLET1_R), (4, 0))
            Line((4, 0), (4 + FILLET1_R, 0))
        make_face()
    fillet1_piece_37 = revolve(axis=Axis((16.5, 10, 7), (0, 1, 0)), revolution_arc=197.933725613, mode=Mode.PRIVATE)
    fillet1_piece_37 = split(fillet1_piece_37, bisect_by=Plane(origin=(12.5, 9.730182657, 5.956665677), z_dir=(1, 0, 0)), keep=Keep.TOP, mode=Mode.PRIVATE)
    add(fillet1_piece_37, mode=Mode.SUBTRACT)
    with BuildSketch(Plane(origin=(-20.5, 9.5, 25), x_dir=(0, 0, -1), z_dir=(0, -1, 0)), Plane(origin=(37.5, 9.5, -25), x_dir=(-1, 0, 0), z_dir=(0, -1, 0)), Plane(origin=(37.5, 9.5, 25), x_dir=(0, 0, -1), z_dir=(0, -1, 0)), Plane(origin=(-37.5, -9.5, 25), x_dir=(0, 0, -1), z_dir=(0, 1, 0)), Plane(origin=(-37.5, -9.5, -25), x_dir=(1, 0, 0), z_dir=(0, 1, 0))) as fillet1_piece_38:
        with BuildLine():
            CenterArc((FILLET1_R, -FILLET1_R), FILLET1_R, 90, 90)
            Line((0, -FILLET1_R), (0, 0))
            Line((0, 0), (FILLET1_R, 0))
        make_face()
    extrude(amount=19, mode=Mode.SUBTRACT)
    with BuildSketch(Plane(origin=(-16.5, -10, -7), x_dir=(0.9514133218682642, 0, 0.30791669485689566), z_dir=(-0.30791669485689566, 0, 0.9514133218682642))) as fillet1_piece_39_section:
        with BuildLine():
            CenterArc((4 + FILLET1_R, FILLET1_R), FILLET1_R, 180, 90)
            Line((4 + FILLET1_R, 0), (4, 0))
            Line((4, 0), (4, FILLET1_R))
        make_face()
    fillet1_piece_39 = revolve(axis=Axis((-16.5, -10, -7), (0, 1, 0)), revolution_arc=197.933725613, mode=Mode.PRIVATE)
    fillet1_piece_39 = split(fillet1_piece_39, bisect_by=Plane(origin=(-12.5, -9.579289162, -5.96924255), z_dir=(-1, 0, 0)), keep=Keep.TOP, mode=Mode.PRIVATE)
    add(fillet1_piece_39, mode=Mode.SUBTRACT)
    with BuildSketch(Plane(origin=(-16.5, 10, -7), x_dir=(0.9514133218682642, 0, 0.30791669485689566), z_dir=(-0.30791669485689566, 0, 0.9514133218682642))) as fillet1_piece_40_section:
        with BuildLine():
            CenterArc((4 + FILLET1_R, -FILLET1_R), FILLET1_R, 90, 90)
            Line((4 + FILLET1_R, 0), (4, 0))
            Line((4, 0), (4, -FILLET1_R))
        make_face()
    fillet1_piece_40 = revolve(axis=Axis((-16.5, 10, -7), (0, 1, 0)), revolution_arc=197.933725613, mode=Mode.PRIVATE)
    fillet1_piece_40 = split(fillet1_piece_40, bisect_by=Plane(origin=(-12.5, 9.579289162, -5.96924255), z_dir=(-1, 0, 0)), keep=Keep.TOP, mode=Mode.PRIVATE)
    add(fillet1_piece_40, mode=Mode.SUBTRACT)
    with BuildSketch(Plane(origin=(-20.5, 10, -7), x_dir=(-1, 0, 0), z_dir=(0, 0, 1))) as fillet1_piece_41:
        with BuildLine():
            CenterArc((FILLET1_R, FILLET1_R), FILLET1_R, 180, 90)
            Line((0, FILLET1_R), (0, 0))
            Line((0, 0), (FILLET1_R, 0))
        make_face()
    extrude(amount=31.5, mode=Mode.SUBTRACT)
    with BuildSketch(Plane(origin=(11.25, -10, 25), x_dir=(0, 0, -1), z_dir=(1, 0, 0))) as fillet1_piece_42a_section:
        with BuildLine():
            CenterArc((FILLET1_R, FILLET1_R), FILLET1_R, 180, 90)
            Line((0, FILLET1_R), (0, 0))
            Line((0, 0), (FILLET1_R, 0))
        make_face()
    fillet1_piece_42a = extrude(amount=25.75, mode=Mode.PRIVATE)
    fillet1_piece_42a = split(fillet1_piece_42a, bisect_by=Plane(origin=(12.5, -9.886802443, 24.886802443), z_dir=(-1, 0, 0)), keep=Keep.TOP, mode=Mode.PRIVATE)
    with BuildSketch(Plane(origin=(12.5, -8.75, 25), x_dir=(-1, 0, 0), z_dir=(0, -1, 0))) as fillet1_piece_42b_section:
        with BuildLine():
            CenterArc((FILLET1_R, FILLET1_R), FILLET1_R, 180, 90)
            Line((0, FILLET1_R), (0, 0))
            Line((0, 0), (FILLET1_R, 0))
        make_face()
    fillet1_piece_42b = extrude(amount=3.75, mode=Mode.PRIVATE)
    fillet1_piece_42b = split(fillet1_piece_42b, bisect_by=Plane(origin=(12.386802443, -10, 24.886802443), z_dir=(0, 1, 0)), keep=Keep.TOP, mode=Mode.PRIVATE)
    fillet1_piece_42 = fillet1_piece_42a & fillet1_piece_42b
    add(fillet1_piece_42, mode=Mode.SUBTRACT)
    with BuildSketch(Plane(origin=(11.25, 10, 25), x_dir=(0, 0, -1), z_dir=(1, 0, 0))) as fillet1_piece_43a_section:
        with BuildLine():
            CenterArc((FILLET1_R, -FILLET1_R), FILLET1_R, 90, 90)
            Line((0, -FILLET1_R), (0, 0))
            Line((0, 0), (FILLET1_R, 0))
        make_face()
    fillet1_piece_43a = extrude(amount=25.75, mode=Mode.PRIVATE)
    fillet1_piece_43a = split(fillet1_piece_43a, bisect_by=Plane(origin=(12.5, 9.886802443, 24.886802443), z_dir=(-1, 0, 0)), keep=Keep.TOP, mode=Mode.PRIVATE)
    with BuildSketch(Plane(origin=(12.5, 8.75, 25), x_dir=(-1, 0, 0), z_dir=(0, 1, 0))) as fillet1_piece_43b_section:
        with BuildLine():
            CenterArc((FILLET1_R, -FILLET1_R), FILLET1_R, 90, 90)
            Line((0, -FILLET1_R), (0, 0))
            Line((0, 0), (FILLET1_R, 0))
        make_face()
    fillet1_piece_43b = extrude(amount=3.75, mode=Mode.PRIVATE)
    fillet1_piece_43b = split(fillet1_piece_43b, bisect_by=Plane(origin=(12.386802443, 10, 24.886802443), z_dir=(0, -1, 0)), keep=Keep.TOP, mode=Mode.PRIVATE)
    fillet1_piece_43 = fillet1_piece_43a & fillet1_piece_43b
    add(fillet1_piece_43, mode=Mode.SUBTRACT)
    with BuildSketch(Plane(origin=(-12.5, 8.75, -25), x_dir=(0, 0, 1), z_dir=(0, 1, 0))) as fillet1_piece_44a_section:
        with BuildLine():
            CenterArc((FILLET1_R, FILLET1_R), FILLET1_R, 180, 90)
            Line((0, FILLET1_R), (0, 0))
            Line((0, 0), (FILLET1_R, 0))
        make_face()
    fillet1_piece_44a = extrude(amount=3.75, mode=Mode.PRIVATE)
    fillet1_piece_44a = split(fillet1_piece_44a, bisect_by=Plane(origin=(-12.386802443, 10, -24.886802443), z_dir=(0, -1, 0)), keep=Keep.TOP, mode=Mode.PRIVATE)
    with BuildSketch(Plane(origin=(-11.25, 10, -25), x_dir=(0, -1, 0), z_dir=(-1, 0, 0))) as fillet1_piece_44b_section:
        with BuildLine():
            CenterArc((FILLET1_R, FILLET1_R), FILLET1_R, 180, 90)
            Line((0, FILLET1_R), (0, 0))
            Line((0, 0), (FILLET1_R, 0))
        make_face()
    fillet1_piece_44b = extrude(amount=25.75, mode=Mode.PRIVATE)
    fillet1_piece_44b = split(fillet1_piece_44b, bisect_by=Plane(origin=(-12.5, 9.886802443, -24.886802443), z_dir=(1, 0, 0)), keep=Keep.TOP, mode=Mode.PRIVATE)
    fillet1_piece_44 = fillet1_piece_44a & fillet1_piece_44b
    add(fillet1_piece_44, mode=Mode.SUBTRACT)
    with BuildSketch(Plane(origin=(-12.5, -8.75, -25), x_dir=(0, 0, 1), z_dir=(0, -1, 0))) as fillet1_piece_45a_section:
        with BuildLine():
            CenterArc((FILLET1_R, -FILLET1_R), FILLET1_R, 90, 90)
            Line((0, -FILLET1_R), (0, 0))
            Line((0, 0), (FILLET1_R, 0))
        make_face()
    fillet1_piece_45a = extrude(amount=3.75, mode=Mode.PRIVATE)
    fillet1_piece_45a = split(fillet1_piece_45a, bisect_by=Plane(origin=(-12.386802443, -10, -24.886802443), z_dir=(0, 1, 0)), keep=Keep.TOP, mode=Mode.PRIVATE)
    with BuildSketch(Plane(origin=(-11.25, -10, -25), x_dir=(0, 1, 0), z_dir=(-1, 0, 0))) as fillet1_piece_45b_section:
        with BuildLine():
            CenterArc((FILLET1_R, -FILLET1_R), FILLET1_R, 90, 90)
            Line((0, -FILLET1_R), (0, 0))
            Line((0, 0), (FILLET1_R, 0))
        make_face()
    fillet1_piece_45b = extrude(amount=25.75, mode=Mode.PRIVATE)
    fillet1_piece_45b = split(fillet1_piece_45b, bisect_by=Plane(origin=(-12.5, -9.886802443, -24.886802443), z_dir=(1, 0, 0)), keep=Keep.TOP, mode=Mode.PRIVATE)
    fillet1_piece_45 = fillet1_piece_45a & fillet1_piece_45b
    add(fillet1_piece_45, mode=Mode.SUBTRACT)


solid = part.part
